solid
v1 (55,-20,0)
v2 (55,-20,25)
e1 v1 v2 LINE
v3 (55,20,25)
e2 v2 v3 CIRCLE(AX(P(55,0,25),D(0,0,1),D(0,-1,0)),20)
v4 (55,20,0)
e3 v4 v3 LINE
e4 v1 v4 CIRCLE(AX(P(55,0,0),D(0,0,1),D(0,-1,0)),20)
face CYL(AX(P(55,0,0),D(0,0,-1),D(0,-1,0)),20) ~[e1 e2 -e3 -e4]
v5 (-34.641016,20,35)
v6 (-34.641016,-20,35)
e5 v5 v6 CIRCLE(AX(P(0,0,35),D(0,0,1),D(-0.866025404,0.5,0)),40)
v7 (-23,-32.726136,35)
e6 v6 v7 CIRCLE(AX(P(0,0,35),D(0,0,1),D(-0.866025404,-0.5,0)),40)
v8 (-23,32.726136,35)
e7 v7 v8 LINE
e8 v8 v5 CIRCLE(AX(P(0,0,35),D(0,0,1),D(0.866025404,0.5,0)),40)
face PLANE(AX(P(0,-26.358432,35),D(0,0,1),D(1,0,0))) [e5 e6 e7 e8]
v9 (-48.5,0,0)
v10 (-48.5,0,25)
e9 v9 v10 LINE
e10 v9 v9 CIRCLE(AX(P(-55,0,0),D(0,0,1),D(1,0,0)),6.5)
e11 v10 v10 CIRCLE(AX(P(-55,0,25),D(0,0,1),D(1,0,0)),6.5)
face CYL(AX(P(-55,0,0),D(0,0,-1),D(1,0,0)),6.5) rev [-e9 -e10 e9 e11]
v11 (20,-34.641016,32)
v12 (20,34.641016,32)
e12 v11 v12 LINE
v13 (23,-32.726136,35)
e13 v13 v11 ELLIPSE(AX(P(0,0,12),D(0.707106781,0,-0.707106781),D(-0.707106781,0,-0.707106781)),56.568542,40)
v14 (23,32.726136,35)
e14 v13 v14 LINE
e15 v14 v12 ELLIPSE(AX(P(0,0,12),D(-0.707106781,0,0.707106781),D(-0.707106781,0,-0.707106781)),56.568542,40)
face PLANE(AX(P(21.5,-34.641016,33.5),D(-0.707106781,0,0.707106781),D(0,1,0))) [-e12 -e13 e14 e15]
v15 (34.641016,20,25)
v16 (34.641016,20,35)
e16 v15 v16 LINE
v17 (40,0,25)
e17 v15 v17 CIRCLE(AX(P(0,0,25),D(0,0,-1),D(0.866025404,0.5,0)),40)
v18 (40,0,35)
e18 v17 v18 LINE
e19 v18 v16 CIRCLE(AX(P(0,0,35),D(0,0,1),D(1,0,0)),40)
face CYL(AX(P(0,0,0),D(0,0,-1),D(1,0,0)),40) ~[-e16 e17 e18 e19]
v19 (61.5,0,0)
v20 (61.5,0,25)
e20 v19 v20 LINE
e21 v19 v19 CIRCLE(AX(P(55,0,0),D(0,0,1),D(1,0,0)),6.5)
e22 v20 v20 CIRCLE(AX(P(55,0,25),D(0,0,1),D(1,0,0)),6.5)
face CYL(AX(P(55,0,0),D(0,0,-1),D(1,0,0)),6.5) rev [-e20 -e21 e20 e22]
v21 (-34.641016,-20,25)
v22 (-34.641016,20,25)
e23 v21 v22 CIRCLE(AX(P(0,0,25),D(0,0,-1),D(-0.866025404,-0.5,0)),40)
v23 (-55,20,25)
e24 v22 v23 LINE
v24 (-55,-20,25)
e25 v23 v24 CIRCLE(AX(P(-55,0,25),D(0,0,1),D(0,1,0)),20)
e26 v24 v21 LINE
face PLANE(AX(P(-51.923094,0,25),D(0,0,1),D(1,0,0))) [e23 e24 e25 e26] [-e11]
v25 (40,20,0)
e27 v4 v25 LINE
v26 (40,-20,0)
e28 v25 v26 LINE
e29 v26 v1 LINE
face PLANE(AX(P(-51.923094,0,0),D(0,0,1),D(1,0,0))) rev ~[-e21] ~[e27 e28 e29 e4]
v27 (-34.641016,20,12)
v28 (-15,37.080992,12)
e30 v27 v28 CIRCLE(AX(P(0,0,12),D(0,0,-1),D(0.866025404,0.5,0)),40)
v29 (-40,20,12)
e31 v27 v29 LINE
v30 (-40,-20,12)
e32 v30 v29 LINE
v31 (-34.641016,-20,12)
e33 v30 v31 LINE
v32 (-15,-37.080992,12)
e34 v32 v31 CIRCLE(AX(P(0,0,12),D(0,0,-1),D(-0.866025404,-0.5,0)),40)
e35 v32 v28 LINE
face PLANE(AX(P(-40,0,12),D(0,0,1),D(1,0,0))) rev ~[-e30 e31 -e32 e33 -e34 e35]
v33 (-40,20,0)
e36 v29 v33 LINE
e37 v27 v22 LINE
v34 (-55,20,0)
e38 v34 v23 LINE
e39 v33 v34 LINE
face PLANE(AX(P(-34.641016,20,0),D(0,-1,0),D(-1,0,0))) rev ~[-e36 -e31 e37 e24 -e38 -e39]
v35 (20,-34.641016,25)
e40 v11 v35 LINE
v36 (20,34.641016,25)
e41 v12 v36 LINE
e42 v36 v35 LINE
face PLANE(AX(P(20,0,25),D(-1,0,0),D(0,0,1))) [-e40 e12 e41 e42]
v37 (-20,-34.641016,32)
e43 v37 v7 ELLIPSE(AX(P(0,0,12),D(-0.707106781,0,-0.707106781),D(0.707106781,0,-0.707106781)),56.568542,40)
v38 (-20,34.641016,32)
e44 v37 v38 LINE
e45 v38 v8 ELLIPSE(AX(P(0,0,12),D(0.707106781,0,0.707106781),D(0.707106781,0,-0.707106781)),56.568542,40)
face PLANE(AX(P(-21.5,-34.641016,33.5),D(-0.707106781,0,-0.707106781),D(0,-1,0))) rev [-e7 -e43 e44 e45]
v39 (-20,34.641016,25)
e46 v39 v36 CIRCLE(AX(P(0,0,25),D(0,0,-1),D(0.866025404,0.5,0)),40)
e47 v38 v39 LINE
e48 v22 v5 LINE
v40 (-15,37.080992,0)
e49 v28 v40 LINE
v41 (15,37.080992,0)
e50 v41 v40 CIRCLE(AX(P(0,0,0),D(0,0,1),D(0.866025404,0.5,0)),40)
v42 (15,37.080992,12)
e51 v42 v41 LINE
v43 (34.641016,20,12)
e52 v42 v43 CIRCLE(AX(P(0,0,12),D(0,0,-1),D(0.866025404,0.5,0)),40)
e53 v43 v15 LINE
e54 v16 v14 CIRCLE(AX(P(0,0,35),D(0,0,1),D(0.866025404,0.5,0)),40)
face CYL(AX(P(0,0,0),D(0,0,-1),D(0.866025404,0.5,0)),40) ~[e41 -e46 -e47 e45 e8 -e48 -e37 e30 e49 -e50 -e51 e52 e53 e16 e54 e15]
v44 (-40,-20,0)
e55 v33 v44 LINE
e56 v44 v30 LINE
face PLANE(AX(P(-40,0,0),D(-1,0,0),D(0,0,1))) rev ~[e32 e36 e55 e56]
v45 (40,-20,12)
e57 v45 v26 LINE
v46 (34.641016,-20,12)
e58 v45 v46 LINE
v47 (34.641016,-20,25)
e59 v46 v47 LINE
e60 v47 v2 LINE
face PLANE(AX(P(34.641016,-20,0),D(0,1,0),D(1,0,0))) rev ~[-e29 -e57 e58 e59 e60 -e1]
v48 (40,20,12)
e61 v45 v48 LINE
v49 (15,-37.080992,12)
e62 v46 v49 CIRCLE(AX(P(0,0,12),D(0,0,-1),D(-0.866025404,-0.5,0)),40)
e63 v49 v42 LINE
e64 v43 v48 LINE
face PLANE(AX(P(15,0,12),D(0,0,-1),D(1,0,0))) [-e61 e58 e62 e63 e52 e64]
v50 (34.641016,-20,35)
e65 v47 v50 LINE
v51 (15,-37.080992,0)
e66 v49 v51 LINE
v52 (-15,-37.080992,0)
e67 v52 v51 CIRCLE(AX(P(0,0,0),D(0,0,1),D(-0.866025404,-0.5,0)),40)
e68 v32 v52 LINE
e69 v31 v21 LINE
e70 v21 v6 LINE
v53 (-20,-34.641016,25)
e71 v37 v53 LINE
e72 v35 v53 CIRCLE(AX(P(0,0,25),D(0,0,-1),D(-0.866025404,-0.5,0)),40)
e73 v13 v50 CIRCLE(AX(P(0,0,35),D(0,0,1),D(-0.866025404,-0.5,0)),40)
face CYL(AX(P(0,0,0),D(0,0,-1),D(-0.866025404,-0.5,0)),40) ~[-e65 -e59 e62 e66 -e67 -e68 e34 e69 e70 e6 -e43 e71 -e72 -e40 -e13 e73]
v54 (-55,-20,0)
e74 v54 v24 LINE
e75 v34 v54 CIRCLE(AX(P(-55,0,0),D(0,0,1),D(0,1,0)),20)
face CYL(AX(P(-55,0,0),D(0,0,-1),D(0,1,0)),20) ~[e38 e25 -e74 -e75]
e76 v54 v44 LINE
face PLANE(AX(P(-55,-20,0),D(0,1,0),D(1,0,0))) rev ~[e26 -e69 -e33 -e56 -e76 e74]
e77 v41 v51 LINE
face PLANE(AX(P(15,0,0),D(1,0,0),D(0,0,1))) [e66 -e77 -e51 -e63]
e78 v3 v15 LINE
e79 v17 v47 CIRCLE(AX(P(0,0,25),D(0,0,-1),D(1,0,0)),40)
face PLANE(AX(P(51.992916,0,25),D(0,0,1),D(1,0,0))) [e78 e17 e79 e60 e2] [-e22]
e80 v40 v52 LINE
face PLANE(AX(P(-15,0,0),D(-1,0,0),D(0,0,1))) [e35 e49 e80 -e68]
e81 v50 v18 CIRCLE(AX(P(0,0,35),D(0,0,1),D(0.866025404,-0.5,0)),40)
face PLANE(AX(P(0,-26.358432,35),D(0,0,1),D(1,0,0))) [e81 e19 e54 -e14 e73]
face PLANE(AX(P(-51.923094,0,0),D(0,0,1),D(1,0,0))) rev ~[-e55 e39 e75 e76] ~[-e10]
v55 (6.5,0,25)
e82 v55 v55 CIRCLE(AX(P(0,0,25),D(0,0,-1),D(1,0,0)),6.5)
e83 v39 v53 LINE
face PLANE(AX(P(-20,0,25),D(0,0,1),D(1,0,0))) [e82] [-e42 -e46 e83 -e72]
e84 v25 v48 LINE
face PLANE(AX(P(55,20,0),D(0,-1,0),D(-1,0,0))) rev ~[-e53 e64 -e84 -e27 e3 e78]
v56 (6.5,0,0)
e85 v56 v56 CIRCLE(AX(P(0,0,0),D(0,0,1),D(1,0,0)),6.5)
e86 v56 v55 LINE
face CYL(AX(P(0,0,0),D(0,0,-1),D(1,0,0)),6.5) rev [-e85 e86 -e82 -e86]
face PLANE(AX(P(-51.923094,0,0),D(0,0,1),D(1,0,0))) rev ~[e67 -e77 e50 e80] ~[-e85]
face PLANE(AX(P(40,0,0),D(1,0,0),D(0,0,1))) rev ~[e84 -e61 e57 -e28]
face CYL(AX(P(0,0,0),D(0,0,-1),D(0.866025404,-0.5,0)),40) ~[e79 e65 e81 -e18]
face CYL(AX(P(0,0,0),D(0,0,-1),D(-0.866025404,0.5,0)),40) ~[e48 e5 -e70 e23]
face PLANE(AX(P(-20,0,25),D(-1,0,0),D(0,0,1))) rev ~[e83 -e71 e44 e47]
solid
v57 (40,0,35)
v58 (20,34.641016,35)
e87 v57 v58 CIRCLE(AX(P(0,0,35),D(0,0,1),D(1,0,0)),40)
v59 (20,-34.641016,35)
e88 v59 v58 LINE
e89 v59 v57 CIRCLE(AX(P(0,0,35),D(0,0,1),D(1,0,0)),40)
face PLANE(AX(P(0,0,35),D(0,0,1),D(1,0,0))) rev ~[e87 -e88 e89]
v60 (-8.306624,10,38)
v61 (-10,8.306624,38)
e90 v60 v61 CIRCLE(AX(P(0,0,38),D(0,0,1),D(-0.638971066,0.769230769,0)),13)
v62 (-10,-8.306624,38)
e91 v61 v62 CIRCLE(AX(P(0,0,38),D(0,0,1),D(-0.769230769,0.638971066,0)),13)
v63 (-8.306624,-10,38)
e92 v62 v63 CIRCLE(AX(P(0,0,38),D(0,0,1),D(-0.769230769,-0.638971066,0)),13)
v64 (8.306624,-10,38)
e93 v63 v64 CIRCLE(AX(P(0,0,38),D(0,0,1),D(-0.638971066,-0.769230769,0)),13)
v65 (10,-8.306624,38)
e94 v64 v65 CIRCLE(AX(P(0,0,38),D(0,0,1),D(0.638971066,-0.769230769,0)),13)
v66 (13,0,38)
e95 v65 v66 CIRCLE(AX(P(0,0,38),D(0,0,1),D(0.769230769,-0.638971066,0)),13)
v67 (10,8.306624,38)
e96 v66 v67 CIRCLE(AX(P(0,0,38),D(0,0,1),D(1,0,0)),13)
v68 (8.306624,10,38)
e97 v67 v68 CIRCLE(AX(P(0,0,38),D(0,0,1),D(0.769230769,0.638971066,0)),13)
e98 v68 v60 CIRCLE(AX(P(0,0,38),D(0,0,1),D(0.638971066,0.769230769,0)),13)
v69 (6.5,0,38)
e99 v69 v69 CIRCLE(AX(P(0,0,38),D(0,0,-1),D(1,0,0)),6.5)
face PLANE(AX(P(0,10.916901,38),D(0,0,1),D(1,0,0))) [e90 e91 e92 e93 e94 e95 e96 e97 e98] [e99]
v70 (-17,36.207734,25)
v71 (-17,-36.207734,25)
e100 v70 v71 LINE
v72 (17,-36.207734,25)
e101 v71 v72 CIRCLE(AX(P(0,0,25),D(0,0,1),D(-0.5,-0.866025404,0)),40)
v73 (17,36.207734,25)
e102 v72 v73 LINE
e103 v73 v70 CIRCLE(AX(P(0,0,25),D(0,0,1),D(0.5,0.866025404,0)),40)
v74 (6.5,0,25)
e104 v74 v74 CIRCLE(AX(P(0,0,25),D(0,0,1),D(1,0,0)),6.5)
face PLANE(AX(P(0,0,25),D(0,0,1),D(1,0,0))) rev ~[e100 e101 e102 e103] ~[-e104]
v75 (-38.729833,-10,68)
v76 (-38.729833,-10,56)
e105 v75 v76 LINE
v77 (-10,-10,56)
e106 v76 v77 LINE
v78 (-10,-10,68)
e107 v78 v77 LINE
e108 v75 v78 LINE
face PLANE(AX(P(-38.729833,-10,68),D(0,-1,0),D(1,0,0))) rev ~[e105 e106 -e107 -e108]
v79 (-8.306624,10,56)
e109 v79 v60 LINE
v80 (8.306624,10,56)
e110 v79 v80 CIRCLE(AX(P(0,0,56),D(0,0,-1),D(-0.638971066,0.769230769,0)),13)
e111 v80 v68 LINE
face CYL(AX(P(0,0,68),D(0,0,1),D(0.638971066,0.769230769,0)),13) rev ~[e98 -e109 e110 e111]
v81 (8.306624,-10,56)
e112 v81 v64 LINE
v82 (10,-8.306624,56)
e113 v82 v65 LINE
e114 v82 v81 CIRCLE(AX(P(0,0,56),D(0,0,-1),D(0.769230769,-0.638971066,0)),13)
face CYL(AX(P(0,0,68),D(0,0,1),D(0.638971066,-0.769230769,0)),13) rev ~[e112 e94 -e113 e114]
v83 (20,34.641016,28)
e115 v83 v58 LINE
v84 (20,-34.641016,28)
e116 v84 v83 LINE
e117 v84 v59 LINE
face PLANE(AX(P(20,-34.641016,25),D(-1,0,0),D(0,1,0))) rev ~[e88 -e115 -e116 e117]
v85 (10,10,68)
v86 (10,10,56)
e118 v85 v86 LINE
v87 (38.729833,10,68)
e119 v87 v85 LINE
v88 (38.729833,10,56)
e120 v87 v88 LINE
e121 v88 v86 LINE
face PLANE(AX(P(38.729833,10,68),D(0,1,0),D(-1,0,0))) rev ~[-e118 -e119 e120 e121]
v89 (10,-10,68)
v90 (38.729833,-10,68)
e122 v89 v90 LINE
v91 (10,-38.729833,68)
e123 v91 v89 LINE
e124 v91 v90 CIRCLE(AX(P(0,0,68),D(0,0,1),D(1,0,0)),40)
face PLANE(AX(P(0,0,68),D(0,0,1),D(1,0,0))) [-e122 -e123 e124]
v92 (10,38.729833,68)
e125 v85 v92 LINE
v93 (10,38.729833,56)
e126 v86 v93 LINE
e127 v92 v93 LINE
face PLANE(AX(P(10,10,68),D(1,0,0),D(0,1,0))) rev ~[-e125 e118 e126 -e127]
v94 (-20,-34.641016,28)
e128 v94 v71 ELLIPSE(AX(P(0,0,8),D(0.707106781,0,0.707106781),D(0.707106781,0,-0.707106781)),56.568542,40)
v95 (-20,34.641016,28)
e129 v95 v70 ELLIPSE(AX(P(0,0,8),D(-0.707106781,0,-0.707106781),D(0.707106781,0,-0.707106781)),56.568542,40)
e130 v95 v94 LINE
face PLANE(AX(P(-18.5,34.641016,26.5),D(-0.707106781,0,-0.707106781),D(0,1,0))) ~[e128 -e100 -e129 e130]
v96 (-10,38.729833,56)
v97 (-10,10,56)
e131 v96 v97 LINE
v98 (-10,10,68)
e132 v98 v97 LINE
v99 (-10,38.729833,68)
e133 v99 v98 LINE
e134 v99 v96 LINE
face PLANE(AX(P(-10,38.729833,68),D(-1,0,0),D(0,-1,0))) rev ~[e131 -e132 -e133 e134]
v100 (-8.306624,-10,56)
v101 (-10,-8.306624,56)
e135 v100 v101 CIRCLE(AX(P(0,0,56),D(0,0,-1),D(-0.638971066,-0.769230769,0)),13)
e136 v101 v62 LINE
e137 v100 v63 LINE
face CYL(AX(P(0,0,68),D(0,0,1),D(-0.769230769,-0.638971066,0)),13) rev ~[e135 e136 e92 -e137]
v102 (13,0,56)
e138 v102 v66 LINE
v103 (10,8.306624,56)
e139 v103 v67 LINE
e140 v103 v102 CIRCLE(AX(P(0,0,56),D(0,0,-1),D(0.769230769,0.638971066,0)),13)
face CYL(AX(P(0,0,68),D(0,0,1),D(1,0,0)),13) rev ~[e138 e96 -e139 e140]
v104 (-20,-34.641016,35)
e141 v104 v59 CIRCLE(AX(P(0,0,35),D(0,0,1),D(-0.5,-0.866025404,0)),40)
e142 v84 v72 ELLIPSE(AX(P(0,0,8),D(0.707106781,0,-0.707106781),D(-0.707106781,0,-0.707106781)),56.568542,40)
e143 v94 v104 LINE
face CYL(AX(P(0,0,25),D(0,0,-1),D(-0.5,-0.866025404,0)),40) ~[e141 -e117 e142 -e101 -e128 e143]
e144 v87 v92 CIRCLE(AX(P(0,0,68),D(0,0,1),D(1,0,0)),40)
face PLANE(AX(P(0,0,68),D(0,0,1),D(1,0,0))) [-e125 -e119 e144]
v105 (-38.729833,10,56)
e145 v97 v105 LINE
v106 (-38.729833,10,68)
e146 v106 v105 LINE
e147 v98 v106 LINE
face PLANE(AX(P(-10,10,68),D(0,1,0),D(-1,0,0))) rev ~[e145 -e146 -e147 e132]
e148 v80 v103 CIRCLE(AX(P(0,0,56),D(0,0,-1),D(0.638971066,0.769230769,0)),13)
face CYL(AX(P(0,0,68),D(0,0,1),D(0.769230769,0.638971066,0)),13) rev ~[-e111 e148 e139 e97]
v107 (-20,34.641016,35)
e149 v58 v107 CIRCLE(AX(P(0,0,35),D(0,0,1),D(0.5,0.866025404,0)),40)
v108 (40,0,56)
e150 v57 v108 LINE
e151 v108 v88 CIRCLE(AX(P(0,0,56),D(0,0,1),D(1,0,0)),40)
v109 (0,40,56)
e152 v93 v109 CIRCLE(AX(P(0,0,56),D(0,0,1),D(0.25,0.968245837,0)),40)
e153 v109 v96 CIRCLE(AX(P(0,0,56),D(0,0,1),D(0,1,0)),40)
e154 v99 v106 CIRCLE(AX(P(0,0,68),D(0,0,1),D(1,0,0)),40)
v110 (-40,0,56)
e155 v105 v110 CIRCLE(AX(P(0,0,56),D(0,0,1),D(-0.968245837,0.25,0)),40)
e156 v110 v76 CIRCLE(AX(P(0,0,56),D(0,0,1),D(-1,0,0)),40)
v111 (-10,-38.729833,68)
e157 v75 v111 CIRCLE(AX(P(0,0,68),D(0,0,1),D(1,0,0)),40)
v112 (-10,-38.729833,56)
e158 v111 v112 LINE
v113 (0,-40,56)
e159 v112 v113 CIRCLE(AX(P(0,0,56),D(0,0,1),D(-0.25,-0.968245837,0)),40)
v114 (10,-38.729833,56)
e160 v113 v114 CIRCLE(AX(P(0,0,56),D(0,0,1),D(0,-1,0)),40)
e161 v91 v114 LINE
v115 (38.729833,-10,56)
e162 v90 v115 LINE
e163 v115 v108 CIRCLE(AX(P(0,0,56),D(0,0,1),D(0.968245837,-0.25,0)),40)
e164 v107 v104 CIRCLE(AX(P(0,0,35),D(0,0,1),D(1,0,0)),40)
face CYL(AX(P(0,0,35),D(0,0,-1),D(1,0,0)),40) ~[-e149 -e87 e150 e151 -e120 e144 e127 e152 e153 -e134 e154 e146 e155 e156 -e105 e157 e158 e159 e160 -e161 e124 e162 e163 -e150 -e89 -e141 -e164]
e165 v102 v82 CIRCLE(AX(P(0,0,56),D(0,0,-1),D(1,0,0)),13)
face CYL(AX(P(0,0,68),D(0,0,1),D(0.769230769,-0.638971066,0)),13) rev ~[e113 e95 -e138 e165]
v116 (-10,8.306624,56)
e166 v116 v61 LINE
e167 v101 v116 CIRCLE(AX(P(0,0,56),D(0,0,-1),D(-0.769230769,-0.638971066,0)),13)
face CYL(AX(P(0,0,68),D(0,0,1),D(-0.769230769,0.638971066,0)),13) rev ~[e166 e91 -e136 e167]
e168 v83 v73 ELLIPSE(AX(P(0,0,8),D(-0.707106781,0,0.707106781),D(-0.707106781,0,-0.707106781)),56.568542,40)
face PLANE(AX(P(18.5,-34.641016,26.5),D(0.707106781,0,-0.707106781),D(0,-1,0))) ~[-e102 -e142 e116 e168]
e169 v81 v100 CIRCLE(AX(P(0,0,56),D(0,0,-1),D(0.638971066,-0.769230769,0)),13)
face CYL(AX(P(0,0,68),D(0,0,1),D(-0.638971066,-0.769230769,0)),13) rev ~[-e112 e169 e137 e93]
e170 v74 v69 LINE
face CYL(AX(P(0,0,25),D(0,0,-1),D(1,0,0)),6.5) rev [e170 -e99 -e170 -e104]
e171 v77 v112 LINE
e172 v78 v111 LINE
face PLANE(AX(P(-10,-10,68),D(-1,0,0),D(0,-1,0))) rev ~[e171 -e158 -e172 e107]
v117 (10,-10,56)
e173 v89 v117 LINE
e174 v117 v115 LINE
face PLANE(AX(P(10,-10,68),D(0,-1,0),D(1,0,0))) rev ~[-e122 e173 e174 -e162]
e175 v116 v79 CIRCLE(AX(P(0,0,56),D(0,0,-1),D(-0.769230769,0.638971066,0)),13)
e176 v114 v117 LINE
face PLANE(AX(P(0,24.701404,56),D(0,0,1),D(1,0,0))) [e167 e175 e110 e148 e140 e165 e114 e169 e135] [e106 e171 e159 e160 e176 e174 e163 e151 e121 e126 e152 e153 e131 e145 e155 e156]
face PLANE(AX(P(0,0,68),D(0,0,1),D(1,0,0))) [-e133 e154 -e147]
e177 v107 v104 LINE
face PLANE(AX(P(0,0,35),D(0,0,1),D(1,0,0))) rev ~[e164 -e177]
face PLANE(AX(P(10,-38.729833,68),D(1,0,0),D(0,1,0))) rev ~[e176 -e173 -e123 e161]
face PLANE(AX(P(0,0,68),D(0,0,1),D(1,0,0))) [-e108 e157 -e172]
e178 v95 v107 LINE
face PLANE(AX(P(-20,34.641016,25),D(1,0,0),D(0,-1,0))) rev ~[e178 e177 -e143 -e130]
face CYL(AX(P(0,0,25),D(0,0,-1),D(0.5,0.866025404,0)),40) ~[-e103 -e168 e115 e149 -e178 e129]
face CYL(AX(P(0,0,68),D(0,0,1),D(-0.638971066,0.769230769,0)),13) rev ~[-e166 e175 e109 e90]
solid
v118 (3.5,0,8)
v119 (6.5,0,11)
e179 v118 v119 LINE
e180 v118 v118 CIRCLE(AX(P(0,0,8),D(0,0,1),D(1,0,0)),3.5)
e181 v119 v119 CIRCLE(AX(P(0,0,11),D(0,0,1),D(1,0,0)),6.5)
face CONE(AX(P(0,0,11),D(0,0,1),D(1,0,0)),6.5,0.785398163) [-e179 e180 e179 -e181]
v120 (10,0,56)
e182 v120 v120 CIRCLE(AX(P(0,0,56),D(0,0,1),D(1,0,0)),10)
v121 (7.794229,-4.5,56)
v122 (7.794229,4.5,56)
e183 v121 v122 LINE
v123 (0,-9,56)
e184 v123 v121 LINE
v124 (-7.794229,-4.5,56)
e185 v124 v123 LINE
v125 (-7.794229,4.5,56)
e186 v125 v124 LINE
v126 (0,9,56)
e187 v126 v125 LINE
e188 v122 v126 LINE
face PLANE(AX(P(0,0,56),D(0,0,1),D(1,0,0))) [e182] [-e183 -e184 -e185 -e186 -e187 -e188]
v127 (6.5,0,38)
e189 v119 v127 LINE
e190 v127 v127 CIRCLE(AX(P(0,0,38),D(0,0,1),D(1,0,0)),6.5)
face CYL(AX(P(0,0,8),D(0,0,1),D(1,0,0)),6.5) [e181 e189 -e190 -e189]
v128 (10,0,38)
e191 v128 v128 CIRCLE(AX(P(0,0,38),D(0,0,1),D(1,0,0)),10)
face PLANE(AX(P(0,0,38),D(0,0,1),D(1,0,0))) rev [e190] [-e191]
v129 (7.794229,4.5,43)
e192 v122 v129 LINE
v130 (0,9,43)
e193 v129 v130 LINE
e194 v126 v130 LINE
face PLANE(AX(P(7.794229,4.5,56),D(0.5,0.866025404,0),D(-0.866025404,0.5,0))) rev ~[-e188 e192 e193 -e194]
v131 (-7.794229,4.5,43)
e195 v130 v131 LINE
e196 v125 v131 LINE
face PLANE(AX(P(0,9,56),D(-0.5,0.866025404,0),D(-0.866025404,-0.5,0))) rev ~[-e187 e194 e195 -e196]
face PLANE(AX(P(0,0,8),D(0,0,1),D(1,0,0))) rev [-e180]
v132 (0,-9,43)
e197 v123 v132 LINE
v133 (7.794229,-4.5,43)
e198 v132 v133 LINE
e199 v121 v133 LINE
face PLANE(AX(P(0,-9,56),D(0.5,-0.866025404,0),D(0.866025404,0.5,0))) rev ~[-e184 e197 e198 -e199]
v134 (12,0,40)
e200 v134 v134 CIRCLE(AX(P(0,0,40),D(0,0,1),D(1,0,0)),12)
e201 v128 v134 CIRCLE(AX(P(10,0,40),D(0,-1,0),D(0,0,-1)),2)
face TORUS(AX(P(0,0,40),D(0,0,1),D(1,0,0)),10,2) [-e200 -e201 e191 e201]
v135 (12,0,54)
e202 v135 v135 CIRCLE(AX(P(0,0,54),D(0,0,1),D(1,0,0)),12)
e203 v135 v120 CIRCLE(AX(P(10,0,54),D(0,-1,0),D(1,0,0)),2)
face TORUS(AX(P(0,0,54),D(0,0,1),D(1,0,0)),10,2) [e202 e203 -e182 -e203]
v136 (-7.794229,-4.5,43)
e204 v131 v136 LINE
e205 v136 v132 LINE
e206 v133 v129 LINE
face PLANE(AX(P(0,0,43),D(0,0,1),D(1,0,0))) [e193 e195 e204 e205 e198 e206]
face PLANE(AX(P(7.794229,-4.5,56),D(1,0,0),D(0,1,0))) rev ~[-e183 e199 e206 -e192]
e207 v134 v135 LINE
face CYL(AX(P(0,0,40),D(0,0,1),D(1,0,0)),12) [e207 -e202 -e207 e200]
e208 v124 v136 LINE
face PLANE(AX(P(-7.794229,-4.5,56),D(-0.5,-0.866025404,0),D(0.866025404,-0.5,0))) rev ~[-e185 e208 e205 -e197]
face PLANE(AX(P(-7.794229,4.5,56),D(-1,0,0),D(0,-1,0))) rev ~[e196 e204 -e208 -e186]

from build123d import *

# Parameters (mm, degrees)
F0_R      = 6.5
F1_DEPTH  = 35
F2_DEPTH  = 25
F3_W      = 40
F3_H      = 10
F3_W_2    = 25
F3_H_2    = 12
F4_DEPTH  = 50
F5_SIZE   = 3
F6_R      = 6.5
F7_DEPTH  = 10
F8_SIZE   = 3
F9_R      = 40
F10_DEPTH = 33
F12_DEPTH = 30
F13_DEPTH = 12
F14_DEPTH = 33.001
F17_SIZE  = 3
F19_DEPTH = 13


with BuildPart() as f1:
    # F0 (on Top) → F1 (new body)
    with BuildSketch(Plane.XY):
        with BuildLine():
            ThreePointArc((-34.6410161514, -20), (0, -40), (34.6410161514, -20))
            Line((34.6410161514, -20), (-34.6410161514, -20))
        make_face()
        with BuildLine():
            ThreePointArc((34.6410161514, -20), (38.6370330516, -10.3527618041), (40, 0))
            ThreePointArc((40, 0), (38.6370330516, 10.3527618041), (34.6410161514, 20))
            Line((34.6410161514, 20), (-34.6410161514, 20))
            ThreePointArc((-34.6410161514, 20), (-40, 0), (-34.6410161514, -20))
            Line((-34.6410161514, -20), (34.6410161514, -20))
        make_face()
        Circle(F0_R, mode=Mode.SUBTRACT)
        with BuildLine():
            Line((-34.6410161514, 20), (34.6410161514, 20))
            ThreePointArc((34.6410161514, 20), (0, 40), (-34.6410161514, 20))
        make_face()
    extrude(amount=F1_DEPTH)

    # F0 (on Top) → F2 (join)
    with BuildSketch(Plane.XY):
        with BuildLine():
            ThreePointArc((-34.6410161514, -20), (-40, 0), (-34.6410161514, 20))
            Line((-34.6410161514, 20), (-55, 20))
            ThreePointArc((-55, 20), (-75, 0), (-55, -20))
            Line((-55, -20), (-34.6410161514, -20))
        make_face()
        with Locations((-55, 0)):
            Circle(F0_R, mode=Mode.SUBTRACT)
        with BuildLine():
            ThreePointArc((34.6410161514, 20), (38.6370330516, 10.3527618041), (40, 0))
            ThreePointArc((40, 0), (38.6370330516, -10.3527618041), (34.6410161514, -20))
            Line((34.6410161514, -20), (55, -20))
            ThreePointArc((55, -20), (75, 0), (55, 20))
            Line((55, 20), (34.6410161514, 20))
        make_face()
        with Locations((55, 0)):
            Circle(F0_R, mode=Mode.SUBTRACT)
    extrude(amount=F2_DEPTH)

    # F3 (on Front) → F4 (cut, symmetric)
    with BuildSketch(Plane.XZ):
        with Locations((0, 30)):
            Rectangle(F3_W, F3_H)
        with Locations((-27.5, 6)):
            Rectangle(F3_W_2, F3_H_2)
        with Locations((27.5, 6)):
            Rectangle(F3_W_2, F3_H_2)
    extrude(amount=F4_DEPTH, both=True, mode=Mode.SUBTRACT)

    # F5
    f5_edges = [f1.edges().sort_by_distance(p)[0] for p in [
        (-20, 0, 35),
        (20, 0, 35),
    ]]
    chamfer(f5_edges, length=F5_SIZE)


with BuildPart() as f7:
    # F6 (on face) → F7 (new body, through all)
    with BuildSketch(Plane.XY.offset(25)):
        with BuildLine():
            Line((20, -34.6410161514), (20, 34.6410161514))
            ThreePointArc((20, 34.6410161514), (0, 40), (-20, 34.6410161514))
            Line((-20, 34.6410161514), (-20, -34.6410161514))
            ThreePointArc((-20, -34.6410161514), (0, -40), (20, -34.6410161514))
        make_face()
        Circle(F6_R, mode=Mode.SUBTRACT)
    extrude(amount=F7_DEPTH)

    # F8
    f8_edges = [f7.edges().sort_by_distance(p)[0] for p in [
        (20, 0, 25),
        (-20, 0, 25),
    ]]
    chamfer(f8_edges, length=F8_SIZE)

    # F9 (on face) → F10 (join)
    with BuildSketch(Plane.XY.offset(35)):
        Circle(F9_R)
    extrude(amount=F10_DEPTH)

    # F11 (on face) → F12 (cut)
    with BuildSketch(Plane.XY.offset(68)):
        with BuildLine():
            Line((-8.3066238629, 10), (8.3066238629, 10))
            ThreePointArc((8.3066238629, 10), (0, 13), (-8.3066238629, 10))
        make_face()
        with BuildLine():
            Line((10, -8.3066238629), (10, 8.3066238629))
            ThreePointArc((10, 8.3066238629), (9.1923881554, 9.1923881554), (8.3066238629, 10))
            Line((8.3066238629, 10), (-8.3066238629, 10))
            ThreePointArc((-8.3066238629, 10), (-9.1923881554, 9.1923881554), (-10, 8.3066238629))
            Line((-10, 8.3066238629), (-10, -8.3066238629))
            ThreePointArc((-10, -8.3066238629), (-9.1923881554, -9.1923881554), (-8.3066238629, -10))
            Line((-8.3066238629, -10), (8.3066238629, -10))
            ThreePointArc((8.3066238629, -10), (9.1923881554, -9.1923881554), (10, -8.3066238629))
        make_face()
        with BuildLine():
            Line((-10, -8.3066238629), (-10, 8.3066238629))
            ThreePointArc((-10, 8.3066238629), (-13, 0), (-10, -8.3066238629))
        make_face()
        with BuildLine():
            ThreePointArc((-8.3066238629, -10), (0, -13), (8.3066238629, -10))
            Line((8.3066238629, -10), (-8.3066238629, -10))
        make_face()
        with BuildLine():
            ThreePointArc((10, -8.3066238629), (12.2270192606, -4.4158804332), (13, 0))
            ThreePointArc((13, 0), (12.2270192606, 4.4158804332), (10, 8.3066238629))
            Line((10, 8.3066238629), (10, -8.3066238629))
        make_face()
    extrude(amount=-F12_DEPTH, mode=Mode.SUBTRACT)

    # F11 (on face) → F13 (cut)
    with BuildSketch(Plane.XY.offset(68)):
        with BuildLine():
            ThreePointArc((-8.3066238629, 10), (0, 13), (8.3066238629, 10))
            Line((8.3066238629, 10), (10, 10))
            Line((10, 10), (10, 38.7298334621))
            ThreePointArc((10, 38.7298334621), (5.0401716969, 39.681187851), (-4.8e-09, 40))
            ThreePointArc((-4.8e-09, 40), (-5.0401717017, 39.6811878504), (-10, 38.7298334621))
            Line((-10, 38.7298334621), (-10, 10))
            Line((-10, 10), (-8.3066238629, 10))
        make_face()
        with BuildLine():
            ThreePointArc((-10, -8.3066238629), (-13, 0), (-10, 8.3066238629))
            Line((-10, 8.3066238629), (-10, 10))
            Line((-10, 10), (-38.7298334621, 10))
            ThreePointArc((-38.7298334621, 10), (-39.6811878507, 5.0401716993), (-40, 0))
            ThreePointArc((-40, 0), (-39.6811878507, -5.0401716993), (-38.7298334621, -10))
            Line((-38.7298334621, -10), (-10, -10))
            Line((-10, -10), (-10, -8.3066238629))
        make_face()
        with BuildLine():
            ThreePointArc((-10, 8.3066238629), (-9.1923881554, 9.1923881554), (-8.3066238629, 10))
            Line((-8.3066238629, 10), (-10, 10))
            Line((-10, 10), (-10, 8.3066238629))
        make_face()
        with BuildLine():
            ThreePointArc((8.3066238629, 10), (9.1923881554, 9.1923881554), (10, 8.3066238629))
            Line((10, 8.3066238629), (10, 10))
            Line((10, 10), (8.3066238629, 10))
        make_face()
        with BuildLine():
            ThreePointArc((10, 8.3066238629), (12.2270192606, 4.4158804332), (13, 0))
            ThreePointArc((13, 0), (12.2270192606, -4.4158804332), (10, -8.3066238629))
            Line((10, -8.3066238629), (10, -10))
            Line((10, -10), (38.7298334621, -10))
            ThreePointArc((38.7298334621, -10), (39.6811878507, -5.0401716993), (40, 0))
            ThreePointArc((40, 0), (39.6811878507, 5.0401716993), (38.7298334621, 10))
            Line((38.7298334621, 10), (10, 10))
            Line((10, 10), (10, 8.3066238629))
        make_face()
        with BuildLine():
            Line((10, -10), (10, -8.3066238629))
            ThreePointArc((10, -8.3066238629), (9.1923881554, -9.1923881554), (8.3066238629, -10))
            Line((8.3066238629, -10), (10, -10))
        make_face()
        with BuildLine():
            Line((10, -10), (8.3066238629, -10))
            ThreePointArc((8.3066238629, -10), (0, -13), (-8.3066238629, -10))
            Line((-8.3066238629, -10), (-10, -10))
            Line((-10, -10), (-10, -38.7298334621))
            ThreePointArc((-10, -38.7298334621), (-5.0401716993, -39.6811878507), (0, -40))
            ThreePointArc((0, -40), (5.0401716993, -39.6811878507), (10, -38.7298334621))
            Line((10, -38.7298334621), (10, -10))
        make_face()
        with BuildLine():
            Line((-10, -10), (-8.3066238629, -10))
            ThreePointArc((-8.3066238629, -10), (-9.1923881554, -9.1923881554), (-10, -8.3066238629))
            Line((-10, -8.3066238629), (-10, -10))
        make_face()
    extrude(amount=-F13_DEPTH, mode=Mode.SUBTRACT)

    # F14 (cut, through all): a face of the model
    f14_faces = [f7.faces().sort_by_distance(p)[0] for p in [
        (0, 0, 35),
    ]]
    extrude(f14_faces, amount=-F14_DEPTH, mode=Mode.SUBTRACT)


with BuildPart() as f16:
    # F15 (on Front) → F16 (revolve)
    with BuildSketch(Plane.XZ):
        with BuildLine():
            Line((10, 56), (0, 56))
            Line((0, 56), (0, 8))
            Line((0, 8), (6.5, 8))
            Line((6.5, 8), (6.5, 38))
            Line((6.5, 38), (10, 38))
            ThreePointArc((10, 38), (11.4142135624, 38.5857864376), (12, 40))
            Line((12, 40), (12, 54))
            ThreePointArc((12, 54), (11.4142135624, 55.4142135624), (10, 56))
        make_face()
    revolve(axis=Axis((0, 0, 32), (0, 0, 1)))

    # F17
    f17_edges = [f16.edges().sort_by_distance(p)[0] for p in [
        (-6.5, 0, 8),
    ]]
    chamfer(f17_edges, length=F17_SIZE)

    # F18 (on face) → F19 (cut)
    with BuildSketch(Plane.XY.offset(56)):
        Polygon((7.7942286341, -4.5), (7.7942286341, 4.5), (0, 9), (-7.7942286341, 4.5), (-7.7942286341, -4.5), (0, -9), align=None)
    extrude(amount=-F19_DEPTH, mode=Mode.SUBTRACT)


solid = Compound([f1.part, f7.part, f16.part])
